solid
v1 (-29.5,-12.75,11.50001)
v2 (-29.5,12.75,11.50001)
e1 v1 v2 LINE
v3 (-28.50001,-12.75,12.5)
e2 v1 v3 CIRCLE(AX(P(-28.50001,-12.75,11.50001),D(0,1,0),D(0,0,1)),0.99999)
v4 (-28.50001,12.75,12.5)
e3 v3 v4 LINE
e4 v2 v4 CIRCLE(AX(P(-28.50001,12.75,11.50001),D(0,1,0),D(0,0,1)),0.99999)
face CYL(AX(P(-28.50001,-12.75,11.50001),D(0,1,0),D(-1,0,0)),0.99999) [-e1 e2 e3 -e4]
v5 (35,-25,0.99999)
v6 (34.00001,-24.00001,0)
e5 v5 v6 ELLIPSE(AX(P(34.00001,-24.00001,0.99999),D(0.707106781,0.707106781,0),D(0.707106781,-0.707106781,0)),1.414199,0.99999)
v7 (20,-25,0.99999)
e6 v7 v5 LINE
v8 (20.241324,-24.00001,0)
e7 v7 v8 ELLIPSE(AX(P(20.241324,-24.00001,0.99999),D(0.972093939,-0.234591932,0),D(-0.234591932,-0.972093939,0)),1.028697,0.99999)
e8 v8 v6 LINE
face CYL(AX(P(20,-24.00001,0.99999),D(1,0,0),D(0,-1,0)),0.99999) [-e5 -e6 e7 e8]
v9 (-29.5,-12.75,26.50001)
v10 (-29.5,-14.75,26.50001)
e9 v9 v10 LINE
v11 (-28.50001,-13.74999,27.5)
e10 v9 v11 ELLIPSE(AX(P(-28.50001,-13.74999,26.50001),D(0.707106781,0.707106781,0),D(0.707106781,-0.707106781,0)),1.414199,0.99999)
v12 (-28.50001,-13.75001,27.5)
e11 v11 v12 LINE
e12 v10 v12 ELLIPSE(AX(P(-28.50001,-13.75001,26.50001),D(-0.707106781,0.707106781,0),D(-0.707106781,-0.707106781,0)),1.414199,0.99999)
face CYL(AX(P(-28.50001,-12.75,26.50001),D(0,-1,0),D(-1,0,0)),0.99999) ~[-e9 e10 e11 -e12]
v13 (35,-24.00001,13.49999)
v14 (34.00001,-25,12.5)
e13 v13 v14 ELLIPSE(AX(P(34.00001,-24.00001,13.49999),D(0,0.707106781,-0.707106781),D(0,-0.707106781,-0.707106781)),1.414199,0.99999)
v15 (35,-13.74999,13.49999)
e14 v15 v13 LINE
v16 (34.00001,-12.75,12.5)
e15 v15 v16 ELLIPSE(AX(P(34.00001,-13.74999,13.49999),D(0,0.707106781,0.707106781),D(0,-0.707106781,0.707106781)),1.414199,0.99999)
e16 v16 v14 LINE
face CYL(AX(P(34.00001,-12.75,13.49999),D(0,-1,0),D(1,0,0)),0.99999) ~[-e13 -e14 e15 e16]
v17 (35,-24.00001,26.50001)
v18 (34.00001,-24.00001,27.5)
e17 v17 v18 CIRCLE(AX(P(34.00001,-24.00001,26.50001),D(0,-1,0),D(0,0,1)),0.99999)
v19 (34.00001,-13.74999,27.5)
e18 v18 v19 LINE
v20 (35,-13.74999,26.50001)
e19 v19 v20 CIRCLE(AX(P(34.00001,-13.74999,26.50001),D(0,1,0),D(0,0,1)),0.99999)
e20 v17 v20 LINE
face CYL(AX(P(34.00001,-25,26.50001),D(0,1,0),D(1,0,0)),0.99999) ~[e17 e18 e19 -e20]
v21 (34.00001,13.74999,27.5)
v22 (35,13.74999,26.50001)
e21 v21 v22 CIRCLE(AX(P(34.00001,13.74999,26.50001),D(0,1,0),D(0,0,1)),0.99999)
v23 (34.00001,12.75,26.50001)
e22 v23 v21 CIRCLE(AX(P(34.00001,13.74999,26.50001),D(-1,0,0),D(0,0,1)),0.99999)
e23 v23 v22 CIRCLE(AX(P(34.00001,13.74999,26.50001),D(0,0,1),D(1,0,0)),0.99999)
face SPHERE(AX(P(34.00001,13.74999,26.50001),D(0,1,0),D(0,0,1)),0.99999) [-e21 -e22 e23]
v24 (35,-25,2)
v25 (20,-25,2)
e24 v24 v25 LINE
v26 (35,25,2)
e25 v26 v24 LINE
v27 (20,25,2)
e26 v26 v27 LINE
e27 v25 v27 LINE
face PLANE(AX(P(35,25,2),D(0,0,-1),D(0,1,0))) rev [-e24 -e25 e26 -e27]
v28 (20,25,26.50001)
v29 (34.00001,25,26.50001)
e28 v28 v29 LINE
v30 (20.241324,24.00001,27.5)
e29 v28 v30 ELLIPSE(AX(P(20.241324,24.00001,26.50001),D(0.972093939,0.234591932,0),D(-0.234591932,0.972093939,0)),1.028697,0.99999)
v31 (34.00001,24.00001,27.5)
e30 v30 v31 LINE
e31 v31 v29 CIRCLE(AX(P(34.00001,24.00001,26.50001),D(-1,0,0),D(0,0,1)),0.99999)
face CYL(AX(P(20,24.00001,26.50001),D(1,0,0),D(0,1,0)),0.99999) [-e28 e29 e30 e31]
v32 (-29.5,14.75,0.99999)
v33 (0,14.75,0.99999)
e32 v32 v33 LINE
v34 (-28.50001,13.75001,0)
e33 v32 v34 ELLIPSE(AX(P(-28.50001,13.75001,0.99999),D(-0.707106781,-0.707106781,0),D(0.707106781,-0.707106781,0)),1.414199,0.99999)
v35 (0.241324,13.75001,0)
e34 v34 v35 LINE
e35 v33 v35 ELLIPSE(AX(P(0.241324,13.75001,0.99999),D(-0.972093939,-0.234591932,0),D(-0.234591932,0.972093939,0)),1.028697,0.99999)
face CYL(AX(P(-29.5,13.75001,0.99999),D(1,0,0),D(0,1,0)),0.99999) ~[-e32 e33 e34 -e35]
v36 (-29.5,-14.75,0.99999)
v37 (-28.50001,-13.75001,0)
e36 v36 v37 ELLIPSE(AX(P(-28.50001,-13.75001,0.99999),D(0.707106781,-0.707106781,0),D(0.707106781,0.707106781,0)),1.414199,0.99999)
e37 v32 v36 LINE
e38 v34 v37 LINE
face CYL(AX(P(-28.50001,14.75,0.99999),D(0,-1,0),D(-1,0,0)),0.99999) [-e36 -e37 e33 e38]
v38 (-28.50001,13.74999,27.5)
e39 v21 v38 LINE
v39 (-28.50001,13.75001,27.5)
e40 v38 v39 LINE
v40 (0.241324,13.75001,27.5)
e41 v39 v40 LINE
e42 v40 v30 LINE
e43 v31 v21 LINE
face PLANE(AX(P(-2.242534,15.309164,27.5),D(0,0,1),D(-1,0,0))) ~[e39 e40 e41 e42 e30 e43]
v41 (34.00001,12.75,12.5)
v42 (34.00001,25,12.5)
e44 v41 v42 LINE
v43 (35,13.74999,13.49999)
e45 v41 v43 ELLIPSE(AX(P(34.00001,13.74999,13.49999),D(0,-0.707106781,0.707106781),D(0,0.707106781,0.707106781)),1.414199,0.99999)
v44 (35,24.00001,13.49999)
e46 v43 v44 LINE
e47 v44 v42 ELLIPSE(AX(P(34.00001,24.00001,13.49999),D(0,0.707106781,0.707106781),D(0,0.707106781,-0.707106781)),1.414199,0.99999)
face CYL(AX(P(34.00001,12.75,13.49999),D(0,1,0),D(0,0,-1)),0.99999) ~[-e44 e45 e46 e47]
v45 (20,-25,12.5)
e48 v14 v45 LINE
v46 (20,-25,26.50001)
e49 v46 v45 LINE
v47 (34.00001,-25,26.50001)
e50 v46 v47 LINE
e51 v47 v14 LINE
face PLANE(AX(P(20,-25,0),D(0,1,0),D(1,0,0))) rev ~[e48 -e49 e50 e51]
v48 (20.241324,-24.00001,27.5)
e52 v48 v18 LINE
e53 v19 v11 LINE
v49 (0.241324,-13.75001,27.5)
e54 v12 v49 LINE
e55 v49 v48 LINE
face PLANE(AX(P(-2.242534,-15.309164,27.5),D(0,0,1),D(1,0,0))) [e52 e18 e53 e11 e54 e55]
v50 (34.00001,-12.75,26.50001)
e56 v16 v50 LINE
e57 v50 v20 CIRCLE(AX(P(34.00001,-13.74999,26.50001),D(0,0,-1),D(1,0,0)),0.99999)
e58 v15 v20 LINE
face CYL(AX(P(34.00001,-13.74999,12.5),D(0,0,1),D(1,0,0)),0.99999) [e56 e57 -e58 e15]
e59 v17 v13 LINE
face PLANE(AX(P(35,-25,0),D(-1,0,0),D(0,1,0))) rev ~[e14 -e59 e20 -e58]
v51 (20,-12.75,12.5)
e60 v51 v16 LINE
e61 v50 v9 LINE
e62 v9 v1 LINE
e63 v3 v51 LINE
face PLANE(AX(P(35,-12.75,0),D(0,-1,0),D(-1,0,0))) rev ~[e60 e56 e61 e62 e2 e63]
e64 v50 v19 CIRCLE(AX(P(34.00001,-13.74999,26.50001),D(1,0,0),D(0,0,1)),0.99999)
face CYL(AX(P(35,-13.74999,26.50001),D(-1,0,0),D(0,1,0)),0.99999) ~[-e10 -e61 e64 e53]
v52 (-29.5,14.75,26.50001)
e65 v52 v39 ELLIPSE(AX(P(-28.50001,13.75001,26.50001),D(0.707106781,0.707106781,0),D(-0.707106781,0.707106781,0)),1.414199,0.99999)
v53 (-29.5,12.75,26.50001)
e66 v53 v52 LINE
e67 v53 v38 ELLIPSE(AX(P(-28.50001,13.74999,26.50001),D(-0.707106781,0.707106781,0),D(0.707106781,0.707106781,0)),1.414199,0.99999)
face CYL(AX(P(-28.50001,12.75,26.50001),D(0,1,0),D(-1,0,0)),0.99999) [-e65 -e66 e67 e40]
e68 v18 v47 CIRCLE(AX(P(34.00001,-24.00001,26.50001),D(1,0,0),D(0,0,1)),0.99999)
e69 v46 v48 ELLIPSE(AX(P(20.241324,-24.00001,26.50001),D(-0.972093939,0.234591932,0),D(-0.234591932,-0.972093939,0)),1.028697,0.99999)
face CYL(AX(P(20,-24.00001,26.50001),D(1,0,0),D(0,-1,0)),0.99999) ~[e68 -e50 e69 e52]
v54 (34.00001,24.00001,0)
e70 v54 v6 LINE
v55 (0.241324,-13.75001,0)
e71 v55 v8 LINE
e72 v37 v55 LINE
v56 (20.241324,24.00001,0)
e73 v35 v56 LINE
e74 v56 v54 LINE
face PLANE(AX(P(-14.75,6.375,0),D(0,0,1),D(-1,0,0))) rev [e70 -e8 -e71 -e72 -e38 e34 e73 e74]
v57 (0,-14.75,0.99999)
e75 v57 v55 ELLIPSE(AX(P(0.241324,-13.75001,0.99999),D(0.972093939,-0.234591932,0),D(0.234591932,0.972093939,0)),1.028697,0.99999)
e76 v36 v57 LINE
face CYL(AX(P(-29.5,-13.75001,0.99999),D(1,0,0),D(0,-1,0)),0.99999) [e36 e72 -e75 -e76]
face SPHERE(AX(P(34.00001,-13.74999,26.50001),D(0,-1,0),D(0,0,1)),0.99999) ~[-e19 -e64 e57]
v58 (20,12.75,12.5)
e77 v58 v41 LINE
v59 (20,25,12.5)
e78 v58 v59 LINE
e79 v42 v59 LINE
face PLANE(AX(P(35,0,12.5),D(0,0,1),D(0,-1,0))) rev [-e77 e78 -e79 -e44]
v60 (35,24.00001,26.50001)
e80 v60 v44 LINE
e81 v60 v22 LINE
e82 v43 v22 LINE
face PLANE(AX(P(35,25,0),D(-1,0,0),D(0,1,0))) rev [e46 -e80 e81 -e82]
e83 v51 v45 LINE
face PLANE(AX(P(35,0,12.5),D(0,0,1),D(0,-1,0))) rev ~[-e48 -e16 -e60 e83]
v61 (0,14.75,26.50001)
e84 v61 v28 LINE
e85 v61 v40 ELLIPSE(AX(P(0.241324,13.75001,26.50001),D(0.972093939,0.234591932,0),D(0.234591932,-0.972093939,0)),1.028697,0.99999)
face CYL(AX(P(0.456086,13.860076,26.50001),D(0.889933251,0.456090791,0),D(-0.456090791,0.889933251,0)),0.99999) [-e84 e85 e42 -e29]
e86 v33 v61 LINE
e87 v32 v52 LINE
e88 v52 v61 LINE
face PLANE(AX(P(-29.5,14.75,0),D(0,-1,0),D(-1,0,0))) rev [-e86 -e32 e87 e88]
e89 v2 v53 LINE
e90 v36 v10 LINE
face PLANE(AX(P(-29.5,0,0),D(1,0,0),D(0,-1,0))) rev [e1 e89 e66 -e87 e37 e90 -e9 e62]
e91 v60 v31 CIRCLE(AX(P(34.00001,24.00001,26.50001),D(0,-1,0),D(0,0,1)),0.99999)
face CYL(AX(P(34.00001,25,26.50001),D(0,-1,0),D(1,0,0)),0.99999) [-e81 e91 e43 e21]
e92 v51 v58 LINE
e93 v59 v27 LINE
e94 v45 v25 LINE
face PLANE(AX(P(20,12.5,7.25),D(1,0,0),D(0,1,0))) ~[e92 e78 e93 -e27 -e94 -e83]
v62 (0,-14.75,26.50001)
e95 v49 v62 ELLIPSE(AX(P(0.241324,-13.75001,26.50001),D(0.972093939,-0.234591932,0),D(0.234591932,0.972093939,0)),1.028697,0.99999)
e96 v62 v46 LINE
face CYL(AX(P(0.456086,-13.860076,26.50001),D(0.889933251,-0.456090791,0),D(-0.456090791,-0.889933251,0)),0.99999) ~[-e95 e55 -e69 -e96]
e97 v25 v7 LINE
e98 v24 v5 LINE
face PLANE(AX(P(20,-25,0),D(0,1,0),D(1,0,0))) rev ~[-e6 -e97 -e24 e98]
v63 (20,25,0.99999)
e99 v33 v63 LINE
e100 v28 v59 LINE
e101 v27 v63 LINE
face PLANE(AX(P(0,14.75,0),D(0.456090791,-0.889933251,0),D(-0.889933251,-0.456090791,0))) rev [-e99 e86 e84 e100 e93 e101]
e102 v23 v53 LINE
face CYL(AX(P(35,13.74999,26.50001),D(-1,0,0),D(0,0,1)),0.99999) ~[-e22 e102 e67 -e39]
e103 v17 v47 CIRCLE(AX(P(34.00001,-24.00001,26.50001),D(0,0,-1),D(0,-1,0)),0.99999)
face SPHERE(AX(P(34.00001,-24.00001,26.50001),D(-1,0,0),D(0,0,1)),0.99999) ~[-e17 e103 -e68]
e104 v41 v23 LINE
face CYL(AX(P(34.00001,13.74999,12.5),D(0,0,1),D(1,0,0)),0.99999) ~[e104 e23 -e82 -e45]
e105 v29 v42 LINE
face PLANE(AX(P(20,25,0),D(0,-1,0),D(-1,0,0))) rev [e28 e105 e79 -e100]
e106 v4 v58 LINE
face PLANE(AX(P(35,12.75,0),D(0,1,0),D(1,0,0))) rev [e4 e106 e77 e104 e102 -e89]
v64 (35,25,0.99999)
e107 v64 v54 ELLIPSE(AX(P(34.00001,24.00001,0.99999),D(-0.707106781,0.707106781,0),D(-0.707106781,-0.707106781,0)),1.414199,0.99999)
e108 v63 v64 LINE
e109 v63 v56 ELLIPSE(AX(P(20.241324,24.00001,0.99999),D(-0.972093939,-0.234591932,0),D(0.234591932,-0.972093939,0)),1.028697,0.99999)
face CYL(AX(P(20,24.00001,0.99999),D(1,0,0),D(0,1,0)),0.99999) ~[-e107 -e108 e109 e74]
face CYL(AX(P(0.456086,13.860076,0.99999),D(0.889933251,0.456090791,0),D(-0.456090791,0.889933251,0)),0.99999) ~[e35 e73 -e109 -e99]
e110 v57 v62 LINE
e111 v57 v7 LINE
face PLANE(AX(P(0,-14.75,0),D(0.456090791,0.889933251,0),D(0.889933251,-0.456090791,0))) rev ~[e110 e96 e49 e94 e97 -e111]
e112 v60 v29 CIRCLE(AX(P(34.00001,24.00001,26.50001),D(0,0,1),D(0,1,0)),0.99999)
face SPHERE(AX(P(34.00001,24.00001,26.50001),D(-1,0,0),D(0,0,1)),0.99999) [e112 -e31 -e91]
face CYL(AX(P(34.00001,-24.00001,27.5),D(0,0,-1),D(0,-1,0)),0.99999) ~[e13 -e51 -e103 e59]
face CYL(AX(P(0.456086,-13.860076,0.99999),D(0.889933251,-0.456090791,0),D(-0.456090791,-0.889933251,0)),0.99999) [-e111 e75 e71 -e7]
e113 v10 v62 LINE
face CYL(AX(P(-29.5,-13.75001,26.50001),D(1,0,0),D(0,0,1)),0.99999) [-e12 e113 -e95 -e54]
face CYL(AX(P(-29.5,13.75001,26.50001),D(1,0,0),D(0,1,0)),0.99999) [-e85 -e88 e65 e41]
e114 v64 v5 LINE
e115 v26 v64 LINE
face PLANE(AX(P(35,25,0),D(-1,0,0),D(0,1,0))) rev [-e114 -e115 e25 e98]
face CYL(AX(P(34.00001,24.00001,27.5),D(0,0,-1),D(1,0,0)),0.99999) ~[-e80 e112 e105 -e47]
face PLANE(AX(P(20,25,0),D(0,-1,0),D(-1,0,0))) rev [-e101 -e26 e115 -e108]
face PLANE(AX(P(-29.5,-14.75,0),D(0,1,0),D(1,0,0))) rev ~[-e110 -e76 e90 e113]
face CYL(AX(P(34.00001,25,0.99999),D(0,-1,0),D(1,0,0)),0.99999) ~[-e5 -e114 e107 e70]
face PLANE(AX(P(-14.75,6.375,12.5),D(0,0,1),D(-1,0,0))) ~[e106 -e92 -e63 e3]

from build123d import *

# Parameters (mm, degrees)
F0_W     = 29.5
F0_H     = 12.75
F0_W_2   = 20
F0_W_3   = 15
F0_H_2   = 12.25
F1_DEPTH = 12.5
F2_DEPTH = 27.5
F4_DEPTH = 15
F6_R     = 0.99999


# Not quite as in the source:
# - a fillet or chamfer is up to 0.001 mm smaller than in the source, because OpenCascade refuses the exact size


with BuildPart() as f1:
    # F0 (on Top) → F1 (new body)
    with BuildSketch(Plane.XY):
        with Locations((-14.75, -6.375)):
            Rectangle(F0_W, F0_H)
        Polygon((20, -12.75), (0, -12.75), (-29.5, -12.75), (-29.5, -14.75), (0, -14.75), (20, -25), align=None)
        with Locations((10, -6.375)):
            Rectangle(F0_W_2, F0_H)
        with Locations((27.5, -6.375)):
            Rectangle(F0_W_3, F0_H)
        with Locations((27.5, -18.875)):
            Rectangle(F0_W_3, F0_H_2)
    extrude(amount=F1_DEPTH)

    # F0 (on Top) → F2 (join)
    with BuildSketch(Plane.XY):
        Polygon((20, -12.75), (0, -12.75), (-29.5, -12.75), (-29.5, -14.75), (0, -14.75), (20, -25), align=None)
        with Locations((27.5, -18.875)):
            Rectangle(F0_W_3, F0_H_2)
    extrude(amount=F2_DEPTH)

    # F3 (on face) → F4 (cut)
    with BuildSketch(Plane.YZ.offset(35)):
        Polygon((-25, 2), (0, 2), (0, 12.5), (-12.75, 12.5), (-25, 12.5), align=None)
    extrude(amount=-F4_DEPTH, mode=Mode.SUBTRACT)

    # F5: F1 across plane


with BuildPart() as f1_1:
    add(f1.part)
    add(f1.part.mirror(Plane.XZ))

    # F6 (radius 1 in the source; OpenCascade refuses exactly that, so slightly less here)
    f6_edges = [f1_1.edges().sort_by_distance(p)[0] for p in [
        (-14.75, -14.75, 0),
        (10, -19.875, 0),
        (27.5, -25, 0),
        (35, 0, 0),
        (27.5, 25, 0),
        (10, 19.875, 0),
        (-14.75, 14.75, 0),
        (-29.5, 0, 0),
        (-29.5, -13.75, 27.5),
        (-14.75, -14.75, 27.5),
        (10, -19.875, 27.5),
        (27.5, -25, 27.5),
        (35, -18.875, 27.5),
        (2.75, -12.75, 27.5),
        (-29.5, 13.75, 27.5),
        (-14.75, 14.75, 27.5),
        (10, 19.875, 27.5),
        (27.5, 25, 27.5),
        (35, 18.875, 27.5),
        (2.75, 12.75, 27.5),
        (35, 25, 20),
        (35, 18.875, 12.5),
        (35, 12.75, 20),
        (35, -18.875, 12.5),
        (35, -12.75, 20),
        (35, -25, 20),
        (-29.5, 0, 12.5),
    ]]
    fillet(f6_edges, radius=F6_R)


solid = f1_1.part
